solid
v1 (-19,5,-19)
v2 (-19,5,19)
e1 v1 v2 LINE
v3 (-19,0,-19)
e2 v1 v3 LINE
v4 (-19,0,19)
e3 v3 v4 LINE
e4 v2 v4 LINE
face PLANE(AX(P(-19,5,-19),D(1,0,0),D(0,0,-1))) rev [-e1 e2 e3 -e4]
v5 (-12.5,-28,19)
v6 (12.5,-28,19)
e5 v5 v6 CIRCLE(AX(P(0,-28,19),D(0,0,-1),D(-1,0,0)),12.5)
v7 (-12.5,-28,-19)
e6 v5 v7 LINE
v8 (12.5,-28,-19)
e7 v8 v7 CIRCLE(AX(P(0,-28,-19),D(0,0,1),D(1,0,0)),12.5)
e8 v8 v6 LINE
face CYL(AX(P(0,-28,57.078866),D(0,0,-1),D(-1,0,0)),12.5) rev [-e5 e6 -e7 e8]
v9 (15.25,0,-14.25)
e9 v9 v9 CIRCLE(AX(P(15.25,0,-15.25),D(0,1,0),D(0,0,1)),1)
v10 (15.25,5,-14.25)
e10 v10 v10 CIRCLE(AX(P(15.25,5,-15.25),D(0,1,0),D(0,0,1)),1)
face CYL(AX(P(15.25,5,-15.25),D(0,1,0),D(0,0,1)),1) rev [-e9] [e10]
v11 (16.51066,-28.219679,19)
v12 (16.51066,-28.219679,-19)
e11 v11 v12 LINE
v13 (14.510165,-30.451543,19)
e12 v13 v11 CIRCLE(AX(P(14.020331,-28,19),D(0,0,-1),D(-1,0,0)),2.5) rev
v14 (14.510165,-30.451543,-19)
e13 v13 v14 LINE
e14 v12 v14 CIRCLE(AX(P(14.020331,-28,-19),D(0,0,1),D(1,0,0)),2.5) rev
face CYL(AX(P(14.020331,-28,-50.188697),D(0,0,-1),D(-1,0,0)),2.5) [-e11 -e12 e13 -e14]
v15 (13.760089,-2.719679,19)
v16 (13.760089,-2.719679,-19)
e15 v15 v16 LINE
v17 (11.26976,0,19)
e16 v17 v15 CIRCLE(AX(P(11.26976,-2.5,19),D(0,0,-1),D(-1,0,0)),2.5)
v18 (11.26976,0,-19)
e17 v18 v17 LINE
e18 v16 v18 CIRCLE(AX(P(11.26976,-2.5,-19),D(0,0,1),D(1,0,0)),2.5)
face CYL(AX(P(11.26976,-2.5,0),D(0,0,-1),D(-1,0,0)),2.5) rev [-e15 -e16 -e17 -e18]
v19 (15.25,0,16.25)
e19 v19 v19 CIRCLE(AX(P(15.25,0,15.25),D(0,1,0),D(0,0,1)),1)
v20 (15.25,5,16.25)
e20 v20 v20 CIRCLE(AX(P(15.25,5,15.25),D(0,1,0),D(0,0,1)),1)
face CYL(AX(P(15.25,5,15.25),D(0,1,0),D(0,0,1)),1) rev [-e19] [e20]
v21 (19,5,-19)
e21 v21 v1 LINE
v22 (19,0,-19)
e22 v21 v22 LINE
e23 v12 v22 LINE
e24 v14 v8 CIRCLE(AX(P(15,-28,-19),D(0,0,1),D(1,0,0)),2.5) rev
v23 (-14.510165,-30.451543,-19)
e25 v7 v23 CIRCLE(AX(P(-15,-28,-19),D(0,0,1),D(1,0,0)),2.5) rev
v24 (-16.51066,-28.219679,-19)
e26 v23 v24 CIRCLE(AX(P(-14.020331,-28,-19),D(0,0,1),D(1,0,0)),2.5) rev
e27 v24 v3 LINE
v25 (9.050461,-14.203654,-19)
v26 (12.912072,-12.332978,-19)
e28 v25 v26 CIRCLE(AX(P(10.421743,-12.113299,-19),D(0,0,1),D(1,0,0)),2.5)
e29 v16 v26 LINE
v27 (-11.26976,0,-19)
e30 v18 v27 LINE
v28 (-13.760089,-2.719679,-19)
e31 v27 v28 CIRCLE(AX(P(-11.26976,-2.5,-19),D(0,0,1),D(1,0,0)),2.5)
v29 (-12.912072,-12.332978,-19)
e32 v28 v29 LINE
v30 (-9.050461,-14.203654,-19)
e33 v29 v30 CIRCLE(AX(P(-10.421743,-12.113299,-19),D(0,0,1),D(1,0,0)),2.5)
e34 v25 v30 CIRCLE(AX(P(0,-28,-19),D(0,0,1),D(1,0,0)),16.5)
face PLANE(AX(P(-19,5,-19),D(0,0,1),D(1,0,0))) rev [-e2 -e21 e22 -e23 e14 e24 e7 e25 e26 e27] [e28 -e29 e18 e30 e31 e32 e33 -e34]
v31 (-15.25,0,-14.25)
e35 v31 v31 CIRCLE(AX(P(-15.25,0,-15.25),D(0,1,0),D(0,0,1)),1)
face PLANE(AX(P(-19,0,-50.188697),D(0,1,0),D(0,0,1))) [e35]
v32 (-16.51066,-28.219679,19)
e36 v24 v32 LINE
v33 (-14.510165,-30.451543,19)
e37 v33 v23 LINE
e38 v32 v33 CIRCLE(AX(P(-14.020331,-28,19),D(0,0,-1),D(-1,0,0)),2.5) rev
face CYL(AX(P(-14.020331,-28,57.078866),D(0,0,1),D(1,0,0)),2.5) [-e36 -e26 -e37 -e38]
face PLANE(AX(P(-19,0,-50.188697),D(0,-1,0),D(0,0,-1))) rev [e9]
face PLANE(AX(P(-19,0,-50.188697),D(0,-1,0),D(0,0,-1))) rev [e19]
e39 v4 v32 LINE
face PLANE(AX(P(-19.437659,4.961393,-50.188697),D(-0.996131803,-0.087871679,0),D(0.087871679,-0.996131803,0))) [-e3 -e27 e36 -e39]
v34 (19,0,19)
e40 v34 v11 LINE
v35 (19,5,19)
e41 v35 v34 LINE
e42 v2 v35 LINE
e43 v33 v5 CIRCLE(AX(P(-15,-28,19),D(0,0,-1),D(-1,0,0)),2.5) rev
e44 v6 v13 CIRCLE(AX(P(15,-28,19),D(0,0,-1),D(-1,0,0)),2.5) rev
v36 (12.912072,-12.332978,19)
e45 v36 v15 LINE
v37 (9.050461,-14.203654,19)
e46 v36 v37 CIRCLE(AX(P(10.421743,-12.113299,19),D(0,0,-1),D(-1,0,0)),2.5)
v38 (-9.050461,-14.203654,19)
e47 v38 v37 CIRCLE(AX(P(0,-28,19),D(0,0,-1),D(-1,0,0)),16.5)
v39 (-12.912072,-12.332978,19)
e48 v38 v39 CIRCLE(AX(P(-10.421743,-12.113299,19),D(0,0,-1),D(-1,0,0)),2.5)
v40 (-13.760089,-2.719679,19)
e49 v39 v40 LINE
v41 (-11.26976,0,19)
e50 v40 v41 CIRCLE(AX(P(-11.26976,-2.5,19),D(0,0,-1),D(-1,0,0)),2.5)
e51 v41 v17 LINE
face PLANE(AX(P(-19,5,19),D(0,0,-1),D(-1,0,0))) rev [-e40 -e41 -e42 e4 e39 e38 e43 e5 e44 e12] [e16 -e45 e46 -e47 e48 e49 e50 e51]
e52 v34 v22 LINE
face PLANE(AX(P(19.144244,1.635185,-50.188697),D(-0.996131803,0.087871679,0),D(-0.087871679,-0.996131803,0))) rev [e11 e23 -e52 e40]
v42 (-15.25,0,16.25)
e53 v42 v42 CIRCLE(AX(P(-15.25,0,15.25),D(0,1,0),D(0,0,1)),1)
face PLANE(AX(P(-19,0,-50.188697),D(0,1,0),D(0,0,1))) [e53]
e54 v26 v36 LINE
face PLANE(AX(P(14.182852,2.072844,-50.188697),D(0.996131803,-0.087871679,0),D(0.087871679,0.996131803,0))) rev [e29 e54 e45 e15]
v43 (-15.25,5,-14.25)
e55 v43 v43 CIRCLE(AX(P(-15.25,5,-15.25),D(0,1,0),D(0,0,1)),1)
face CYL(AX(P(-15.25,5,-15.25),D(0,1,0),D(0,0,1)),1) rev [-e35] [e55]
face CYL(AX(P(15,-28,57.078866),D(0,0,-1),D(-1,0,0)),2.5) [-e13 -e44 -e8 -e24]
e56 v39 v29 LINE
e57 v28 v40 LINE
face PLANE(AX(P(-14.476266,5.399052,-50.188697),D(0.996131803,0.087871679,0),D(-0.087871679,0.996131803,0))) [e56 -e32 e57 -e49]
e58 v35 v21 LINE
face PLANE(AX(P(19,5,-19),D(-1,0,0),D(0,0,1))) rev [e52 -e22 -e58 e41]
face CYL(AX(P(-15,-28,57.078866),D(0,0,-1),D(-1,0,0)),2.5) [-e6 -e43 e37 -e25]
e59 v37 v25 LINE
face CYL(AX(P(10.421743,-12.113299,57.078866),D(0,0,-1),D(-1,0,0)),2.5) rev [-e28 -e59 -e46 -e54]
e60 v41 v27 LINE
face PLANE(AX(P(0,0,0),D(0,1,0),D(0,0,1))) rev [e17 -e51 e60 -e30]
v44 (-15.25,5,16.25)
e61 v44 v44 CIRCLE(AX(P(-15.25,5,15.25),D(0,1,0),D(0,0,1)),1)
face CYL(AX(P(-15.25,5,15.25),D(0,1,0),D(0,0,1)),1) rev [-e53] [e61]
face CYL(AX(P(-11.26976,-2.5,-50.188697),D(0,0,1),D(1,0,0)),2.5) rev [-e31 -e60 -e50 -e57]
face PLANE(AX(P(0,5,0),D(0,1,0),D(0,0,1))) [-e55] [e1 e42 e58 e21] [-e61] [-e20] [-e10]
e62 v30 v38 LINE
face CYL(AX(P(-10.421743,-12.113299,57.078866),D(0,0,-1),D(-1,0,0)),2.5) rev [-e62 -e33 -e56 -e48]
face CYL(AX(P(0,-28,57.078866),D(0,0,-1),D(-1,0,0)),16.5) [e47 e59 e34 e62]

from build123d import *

# Parameters (mm, degrees)
SKETCH1_W                = 38
SKETCH1_H                = 38
BOSS_EXTRUDE1_DEPTH      = 5
F_2_0_2_DIAMETER_HOLE1_D = 2
BOSS_EXTRUDE3_START      = -19
BOSS_EXTRUDE3_DEPTH      = 38
BOSS_EXTRUDE4_START      = 19
BOSS_EXTRUDE4_DEPTH      = 38
FILLET5_START            = -20
FILLET5_DEPTH            = 40
FILLET5_START_2          = -19
FILLET5_2_DEPTH          = 38


with BuildPart() as part:
    # Sketch1 → Boss-Extrude1 (new body)
    with BuildSketch(Plane(origin=(0, 0, 0), x_dir=(1, 0, 0), z_dir=(0, 1, 0))):
        Rectangle(SKETCH1_W, SKETCH1_H)
    extrude(amount=BOSS_EXTRUDE1_DEPTH)

    # Ø2.0 (2) Diameter Hole1 (through all)
    with Locations(Plane(origin=(0, 5, 0), x_dir=(1, 0, 0), z_dir=(0, 1, 0))):
        with Locations((-15.25, 15.25), (15.25, 15.25), (15.25, -15.25), (-15.25, -15.25)):
            Hole(F_2_0_2_DIAMETER_HOLE1_D / 2)



with BuildPart() as body_2:
    # Sketch10 → Boss-Extrude3 (new body)
    with BuildSketch(Plane.XY.offset(BOSS_EXTRUDE3_START)):
        with BuildLine():
            Line((-12.247448714, -30.5), (-16.30950643, -30.5))
            ThreePointArc((-16.30950643, -30.5), (0, -11.5), (16.30950643, -30.5))
            Line((16.30950643, -30.5), (12.247448714, -30.5))
            ThreePointArc((12.247448714, -30.5), (0, -15.5), (-12.247448714, -30.5))
        make_face()
    extrude(amount=BOSS_EXTRUDE3_DEPTH)


with BuildPart() as part_1:
    add(part.part)

    add(body_2.part)  # Boss-Extrude4 merges body 2
    # Sketch11 → Boss-Extrude4 (add)
    with BuildSketch(Plane.XY.offset(BOSS_EXTRUDE4_START)):
        Polygon((-19, 0), (-16.30950643, -30.5), (-12.481964126, -17.208773398), (-14, 0), align=None)
    boss_extrude4 = extrude(amount=-BOSS_EXTRUDE4_DEPTH)

    # Mirror1: Boss-Extrude4 across plane
    add(boss_extrude4.mirror(Plane(origin=(0, 0, 0), x_dir=(0, 0, 1), z_dir=(1, 0, 0))))

    # Fillet5: read off the stored shape, not the designer's step
    # Fillet5 outline → Fillet5 (cut)
    with BuildSketch(Plane.XY.offset(FILLET5_START)):
        with BuildLine():
            ThreePointArc((16.51066015, -28.219679197), (15.881955848, -29.668637648), (14.510165322, -30.451542777))
            ThreePointArc((14.510165322, -30.451542777), (13.066791954, -29.585151934), (12.5, -28))
            ThreePointArc((12.5, -28), (12.436701913, -29.256362025), (12.247448714, -30.5))
            Line((12.247448714, -30.5), (16.30950643, -30.5))
            ThreePointArc((16.30950643, -30.5), (16.436174742, -29.449882703), (16.495299812, -28.393807221))
            Line((16.495299812, -28.393807221), (16.51066015, -28.219679197))
        make_face()
        with BuildLine():
            ThreePointArc((-12.247448714, -30.5), (-12.436701913, -29.256362025), (-12.5, -28))
            ThreePointArc((-12.5, -28), (-13.066791954, -29.585151934), (-14.510165322, -30.451542777))
            ThreePointArc((-14.510165322, -30.451542777), (-15.881955848, -29.668637648), (-16.51066015, -28.219679197))
            Line((-16.51066015, -28.219679197), (-16.495299812, -28.393807221))
            ThreePointArc((-16.495299812, -28.393807221), (-16.436174742, -29.449882703), (-16.30950643, -30.5))
            Line((-16.30950643, -30.5), (-12.247448714, -30.5))
        make_face()
    extrude(amount=FILLET5_DEPTH, mode=Mode.SUBTRACT)

    # Fillet5 2 outline → Fillet5 2 (add)
    with BuildSketch(Plane.XY.offset(FILLET5_START_2)):
        with BuildLine():
            Line((12.481964126, -17.208773398), (12.912072208, -12.33297787))
            ThreePointArc((12.912072208, -12.33297787), (11.511662087, -14.363204389), (9.050460767, -14.203654111))
            ThreePointArc((9.050460767, -14.203654111), (10.870557296, -15.587063841), (12.481964126, -17.208773398))
        make_face()
        with BuildLine():
            ThreePointArc((11.269759694, 0), (13.113559845, -0.811686936), (13.7600892, -2.719679197))
            Line((13.7600892, -2.719679197), (14, 0))
            Line((14, 0), (11.269759694, 0))
        make_face()
        with BuildLine():
            ThreePointArc((-12.481964126, -17.208773398), (-10.870557296, -15.587063841), (-9.050460767, -14.20365411))
            ThreePointArc((-9.050460767, -14.20365411), (-11.511662087, -14.363204389), (-12.912072208, -12.33297787))
            Line((-12.912072208, -12.33297787), (-12.481964126, -17.208773398))
        make_face()
        with BuildLine():
            ThreePointArc((-13.7600892, -2.719679197), (-13.113559845, -0.811686936), (-11.269759694, 0))
            Line((-11.269759694, 0), (-14, 0))
            Line((-14, 0), (-13.7600892, -2.719679197))
        make_face()
    extrude(amount=FILLET5_2_DEPTH)


solid = part_1.part
